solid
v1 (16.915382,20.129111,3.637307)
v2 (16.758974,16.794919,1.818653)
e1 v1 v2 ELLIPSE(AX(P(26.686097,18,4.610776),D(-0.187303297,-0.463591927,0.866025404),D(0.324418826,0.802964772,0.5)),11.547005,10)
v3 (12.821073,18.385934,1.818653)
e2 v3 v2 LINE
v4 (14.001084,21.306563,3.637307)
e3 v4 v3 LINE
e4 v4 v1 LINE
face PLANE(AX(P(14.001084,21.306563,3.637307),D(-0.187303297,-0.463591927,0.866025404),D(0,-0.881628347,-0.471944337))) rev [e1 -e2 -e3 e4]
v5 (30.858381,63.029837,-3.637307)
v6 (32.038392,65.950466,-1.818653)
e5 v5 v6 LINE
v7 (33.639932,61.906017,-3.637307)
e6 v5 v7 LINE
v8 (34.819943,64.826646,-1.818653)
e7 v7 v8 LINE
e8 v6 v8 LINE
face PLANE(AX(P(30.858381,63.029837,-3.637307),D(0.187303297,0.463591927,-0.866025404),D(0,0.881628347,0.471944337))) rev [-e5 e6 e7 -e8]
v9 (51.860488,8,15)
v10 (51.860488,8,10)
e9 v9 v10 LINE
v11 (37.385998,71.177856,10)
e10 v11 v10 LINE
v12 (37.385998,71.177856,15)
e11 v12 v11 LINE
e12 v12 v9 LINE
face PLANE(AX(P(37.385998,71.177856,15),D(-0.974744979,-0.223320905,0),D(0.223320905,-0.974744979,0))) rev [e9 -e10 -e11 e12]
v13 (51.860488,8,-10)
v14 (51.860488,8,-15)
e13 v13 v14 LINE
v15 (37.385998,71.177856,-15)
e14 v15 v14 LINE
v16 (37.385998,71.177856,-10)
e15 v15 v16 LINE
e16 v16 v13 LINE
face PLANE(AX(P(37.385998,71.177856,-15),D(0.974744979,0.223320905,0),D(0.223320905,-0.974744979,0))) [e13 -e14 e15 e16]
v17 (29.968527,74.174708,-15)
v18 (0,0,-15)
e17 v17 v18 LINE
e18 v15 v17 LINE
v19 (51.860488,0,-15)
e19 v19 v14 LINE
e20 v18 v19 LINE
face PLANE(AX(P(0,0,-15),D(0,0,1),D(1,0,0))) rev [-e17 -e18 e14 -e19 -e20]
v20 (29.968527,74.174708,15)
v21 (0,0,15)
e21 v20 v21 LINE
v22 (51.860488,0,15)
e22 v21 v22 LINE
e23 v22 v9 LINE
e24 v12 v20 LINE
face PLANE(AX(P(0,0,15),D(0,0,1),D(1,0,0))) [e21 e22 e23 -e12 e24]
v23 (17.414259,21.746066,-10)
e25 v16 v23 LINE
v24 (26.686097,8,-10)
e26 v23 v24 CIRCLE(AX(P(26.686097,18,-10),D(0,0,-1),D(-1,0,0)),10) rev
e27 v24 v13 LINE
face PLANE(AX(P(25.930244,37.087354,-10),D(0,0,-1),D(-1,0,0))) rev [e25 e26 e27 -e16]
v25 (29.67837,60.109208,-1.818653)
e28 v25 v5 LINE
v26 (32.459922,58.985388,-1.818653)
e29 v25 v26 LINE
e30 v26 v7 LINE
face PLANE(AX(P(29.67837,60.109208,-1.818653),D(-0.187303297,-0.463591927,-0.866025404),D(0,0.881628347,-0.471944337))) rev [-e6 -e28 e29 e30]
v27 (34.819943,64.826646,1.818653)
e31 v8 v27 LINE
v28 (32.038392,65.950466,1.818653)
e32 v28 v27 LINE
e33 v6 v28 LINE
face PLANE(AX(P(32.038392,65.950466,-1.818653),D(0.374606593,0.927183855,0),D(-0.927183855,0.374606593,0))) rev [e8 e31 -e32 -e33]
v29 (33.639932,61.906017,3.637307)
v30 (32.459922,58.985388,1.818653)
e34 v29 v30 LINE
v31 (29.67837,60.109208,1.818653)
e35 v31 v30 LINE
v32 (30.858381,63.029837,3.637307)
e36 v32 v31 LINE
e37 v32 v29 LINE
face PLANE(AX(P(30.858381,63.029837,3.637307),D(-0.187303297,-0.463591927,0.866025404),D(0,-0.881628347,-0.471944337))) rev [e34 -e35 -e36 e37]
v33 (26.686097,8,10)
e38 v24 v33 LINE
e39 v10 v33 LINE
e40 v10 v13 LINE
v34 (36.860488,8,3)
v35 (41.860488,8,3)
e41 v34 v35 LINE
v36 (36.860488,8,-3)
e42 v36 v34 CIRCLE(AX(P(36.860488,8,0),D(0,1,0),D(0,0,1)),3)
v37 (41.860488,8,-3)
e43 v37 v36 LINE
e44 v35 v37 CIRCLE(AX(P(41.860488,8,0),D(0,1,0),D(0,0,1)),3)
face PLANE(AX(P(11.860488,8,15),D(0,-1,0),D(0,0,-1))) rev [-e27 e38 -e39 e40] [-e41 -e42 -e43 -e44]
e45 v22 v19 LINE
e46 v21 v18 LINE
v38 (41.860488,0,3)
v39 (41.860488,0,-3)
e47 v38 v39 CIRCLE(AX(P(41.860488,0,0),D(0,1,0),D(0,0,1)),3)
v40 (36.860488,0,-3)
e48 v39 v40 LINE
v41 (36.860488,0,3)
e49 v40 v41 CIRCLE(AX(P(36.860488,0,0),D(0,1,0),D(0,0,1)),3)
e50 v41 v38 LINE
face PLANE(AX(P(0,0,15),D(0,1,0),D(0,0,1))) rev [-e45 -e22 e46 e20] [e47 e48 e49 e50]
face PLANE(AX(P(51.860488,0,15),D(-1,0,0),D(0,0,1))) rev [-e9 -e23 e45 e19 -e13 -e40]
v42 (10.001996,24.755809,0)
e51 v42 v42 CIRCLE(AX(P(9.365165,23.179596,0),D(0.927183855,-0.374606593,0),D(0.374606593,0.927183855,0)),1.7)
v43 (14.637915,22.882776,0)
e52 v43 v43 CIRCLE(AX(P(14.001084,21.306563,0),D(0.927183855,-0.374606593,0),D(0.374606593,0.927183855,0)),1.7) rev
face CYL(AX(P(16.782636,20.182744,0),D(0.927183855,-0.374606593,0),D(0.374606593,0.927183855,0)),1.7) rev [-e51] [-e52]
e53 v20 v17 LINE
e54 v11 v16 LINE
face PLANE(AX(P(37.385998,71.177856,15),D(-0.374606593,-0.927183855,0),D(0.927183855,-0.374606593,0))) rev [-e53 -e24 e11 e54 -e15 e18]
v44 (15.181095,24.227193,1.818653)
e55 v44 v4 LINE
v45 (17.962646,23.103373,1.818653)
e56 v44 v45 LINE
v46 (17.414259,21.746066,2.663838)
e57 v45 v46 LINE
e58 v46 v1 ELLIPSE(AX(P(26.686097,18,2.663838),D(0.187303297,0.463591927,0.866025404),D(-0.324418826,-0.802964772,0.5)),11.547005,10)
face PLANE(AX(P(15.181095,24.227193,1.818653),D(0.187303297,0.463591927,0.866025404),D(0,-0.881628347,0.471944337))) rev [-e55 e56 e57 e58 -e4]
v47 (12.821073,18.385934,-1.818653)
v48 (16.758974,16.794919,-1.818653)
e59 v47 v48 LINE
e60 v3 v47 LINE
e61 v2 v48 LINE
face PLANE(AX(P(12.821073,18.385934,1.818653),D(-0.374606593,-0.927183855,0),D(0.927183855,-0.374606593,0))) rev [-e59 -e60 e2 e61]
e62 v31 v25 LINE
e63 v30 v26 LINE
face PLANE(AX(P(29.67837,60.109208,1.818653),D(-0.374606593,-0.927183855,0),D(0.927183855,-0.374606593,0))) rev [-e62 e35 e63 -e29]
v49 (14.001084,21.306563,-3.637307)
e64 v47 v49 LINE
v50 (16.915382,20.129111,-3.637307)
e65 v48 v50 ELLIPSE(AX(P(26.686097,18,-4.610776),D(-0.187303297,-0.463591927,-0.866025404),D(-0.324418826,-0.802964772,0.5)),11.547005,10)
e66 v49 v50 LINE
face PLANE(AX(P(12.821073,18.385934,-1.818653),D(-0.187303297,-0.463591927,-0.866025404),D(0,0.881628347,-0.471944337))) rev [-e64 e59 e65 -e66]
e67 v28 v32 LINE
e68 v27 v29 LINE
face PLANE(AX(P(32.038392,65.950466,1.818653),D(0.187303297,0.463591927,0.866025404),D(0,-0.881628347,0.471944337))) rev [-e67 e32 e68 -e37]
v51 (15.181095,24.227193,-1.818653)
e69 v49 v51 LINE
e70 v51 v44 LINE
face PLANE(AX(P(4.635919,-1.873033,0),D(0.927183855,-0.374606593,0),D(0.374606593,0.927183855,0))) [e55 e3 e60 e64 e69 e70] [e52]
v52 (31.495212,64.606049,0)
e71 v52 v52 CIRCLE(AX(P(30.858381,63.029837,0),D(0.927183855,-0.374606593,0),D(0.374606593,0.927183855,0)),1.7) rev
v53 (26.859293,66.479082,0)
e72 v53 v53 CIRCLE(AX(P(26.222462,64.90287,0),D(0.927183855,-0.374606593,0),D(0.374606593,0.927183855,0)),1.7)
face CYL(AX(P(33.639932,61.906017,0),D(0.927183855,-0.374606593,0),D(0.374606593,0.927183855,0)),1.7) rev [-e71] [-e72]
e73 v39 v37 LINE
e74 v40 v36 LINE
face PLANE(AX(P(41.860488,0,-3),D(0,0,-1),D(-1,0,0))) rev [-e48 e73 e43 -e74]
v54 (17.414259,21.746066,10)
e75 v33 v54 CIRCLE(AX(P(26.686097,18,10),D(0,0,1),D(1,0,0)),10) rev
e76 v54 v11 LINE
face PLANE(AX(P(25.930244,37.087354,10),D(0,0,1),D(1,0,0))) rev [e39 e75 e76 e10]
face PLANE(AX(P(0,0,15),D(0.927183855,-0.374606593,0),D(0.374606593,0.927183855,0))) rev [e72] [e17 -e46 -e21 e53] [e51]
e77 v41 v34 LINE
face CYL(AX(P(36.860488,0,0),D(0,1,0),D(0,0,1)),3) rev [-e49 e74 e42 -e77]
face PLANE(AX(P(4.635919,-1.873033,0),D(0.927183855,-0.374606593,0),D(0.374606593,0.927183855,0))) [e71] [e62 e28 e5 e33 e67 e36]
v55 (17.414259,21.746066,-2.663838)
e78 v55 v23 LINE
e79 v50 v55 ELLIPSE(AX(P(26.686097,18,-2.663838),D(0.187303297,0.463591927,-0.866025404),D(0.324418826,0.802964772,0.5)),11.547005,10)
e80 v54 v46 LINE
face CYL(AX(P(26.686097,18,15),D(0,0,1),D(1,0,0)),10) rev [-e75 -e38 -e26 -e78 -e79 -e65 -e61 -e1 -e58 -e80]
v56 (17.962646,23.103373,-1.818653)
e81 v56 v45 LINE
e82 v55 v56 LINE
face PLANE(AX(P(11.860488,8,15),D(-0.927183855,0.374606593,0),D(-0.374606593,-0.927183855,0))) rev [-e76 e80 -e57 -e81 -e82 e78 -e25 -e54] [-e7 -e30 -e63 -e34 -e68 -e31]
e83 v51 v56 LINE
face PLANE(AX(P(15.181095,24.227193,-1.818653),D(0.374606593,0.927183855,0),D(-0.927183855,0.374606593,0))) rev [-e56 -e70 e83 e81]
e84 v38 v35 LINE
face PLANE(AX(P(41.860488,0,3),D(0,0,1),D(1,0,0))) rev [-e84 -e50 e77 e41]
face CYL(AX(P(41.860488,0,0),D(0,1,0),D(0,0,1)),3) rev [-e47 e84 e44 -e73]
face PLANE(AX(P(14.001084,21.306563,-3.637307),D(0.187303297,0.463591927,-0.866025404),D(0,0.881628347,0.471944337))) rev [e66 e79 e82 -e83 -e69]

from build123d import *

# Parameters (mm, degrees)
BOSS_EXTRUDE1_DEPTH           = 15
CUT_EXTRUDE1_DEPTH            = 86.172406393
RIB1_REACH                    = 97.349
SKETCH4_WALL_W                = 257.512394394
SKETCH4_WALL_H                = 5
M3_CLEARANCE_HOLE1_AT_2_COUNT = 2
M3_CLEARANCE_HOLE1_AT_2_PITCH = 45
CUT_EXTRUDE2_DEPTH            = 3
FILLET1_R                     = 10


with BuildPart() as part:
    # Sketch1 → Boss-Extrude1 (new, symmetric)
    with BuildSketch(Plane.XY):
        Polygon((0, 0), (29.968527473, 74.174708365), (37.38599831, 71.177855618), (11.860487748, 8), (51.860487748, 8), (51.860487748, 0), align=None)
    extrude(amount=BOSS_EXTRUDE1_DEPTH, both=True)

    # Sketch2 → Cut-Extrude1 (cut, through all)
    with BuildSketch(Plane(origin=(0.379940125, 8, 0), x_dir=(1, 0, 0), z_dir=(0, 1, 0))):
        with BuildLine():
            Line((41.480547623, -3), (36.480547623, -3))
            ThreePointArc((36.480547623, -3), (33.480547623, 0), (36.480547623, 3))
            Line((36.480547623, 3), (41.480547623, 3))
            ThreePointArc((41.480547623, 3), (44.480547623, 0), (41.480547623, -3))
        make_face()
    extrude(amount=-CUT_EXTRUDE1_DEPTH, mode=Mode.SUBTRACT)

    # Sketch4 wall → Rib1 (add, up to next)
    with BuildSketch(Plane(origin=(44.623243029, 39.588927809, 15), x_dir=(0.223320905083, -0.974744978624, 0), z_dir=(0.974744978624, 0.223320905083, 0)), mode=Mode.PRIVATE) as rib1_sk1:
        with Locations((0, 2.5)):
            Rectangle(SKETCH4_WALL_W, SKETCH4_WALL_H)
    rib1_tool1 = extrude(rib1_sk1.sketch, amount=-RIB1_REACH, mode=Mode.PRIVATE) - part.part
    rib1 = rib1_tool1.solids().sort_by_distance((44.623243029, 39.588927809, 15))[0]
    add(rib1)

    # Mirror1: Rib1 across plane
    add(rib1.mirror(Plane.XY))

    # Sketch7 → M3 Clearance Hole1 (revolve, cut)
    with BuildSketch(Plane(origin=(33.639932376, 61.906017072, 0), x_dir=(0.37460659341591607, 0.9271838545667858, 0), z_dir=(0, 0, 1))):
        Polygon((0, 0), (0, 35.786334818), (1.7, 35.786334818), (1.7, 0.025), (1.725, 0), align=None)
    m3_clearance_hole1 = revolve(axis=Axis((39.527549852, 59.527265204, 0), (-0.9271838545667858, 0.37460659341591607, 0)), mode=Mode.SUBTRACT)

    # M3 Clearance Hole1 at 2: M3 Clearance Hole1 ×2
    with Locations(*[Vector(-0.37460659341591607, -0.9271838545667858, 0) * (i * M3_CLEARANCE_HOLE1_AT_2_PITCH) for i in range(1, M3_CLEARANCE_HOLE1_AT_2_COUNT)]):
        add(m3_clearance_hole1, mode=Mode.SUBTRACT)

    # Sketch8 → Cut-Extrude2 (cut)
    with BuildSketch(Plane(origin=(7.417470837, -2.996852747, 0), x_dir=(0, 0, -1), z_dir=(0.9271838545667858, -0.37460659341591607, 0))):
        Polygon((3.637306696, 70), (1.818653348, 73.15), (-1.818653348, 73.15), (-3.637306696, 70), (-1.818653348, 66.85), (1.818653348, 66.85), align=None)
        Polygon((3.637306696, 25), (1.818653348, 28.15), (-1.818653348, 28.15), (-3.637306696, 25), (-1.818653348, 21.85), (1.818653348, 21.85), align=None)
    extrude(amount=-CUT_EXTRUDE2_DEPTH, mode=Mode.SUBTRACT)

    # Fillet1
    # the kernel refuses this fillet: 10 mm, written as the material it adds along each edge
    with BuildSketch(Plane(origin=(11.860487748, 8, 47.064024213), x_dir=(0.3746065934159096, 0.9271838545667884, 0), z_dir=(0, 0, -1))) as fillet1_piece_1_section:
        with BuildLine():
            CenterArc((FILLET1_R * 1.48256096851, FILLET1_R), FILLET1_R, 158, 112)
            Line((FILLET1_R * 0.555377113946, FILLET1_R * 1.37460659342), (0, 0))
            Line((0, 0), (FILLET1_R * 1.48256096851, 0))
        make_face()
    fillet1_piece_1 = extrude(amount=94.128048426, mode=Mode.PRIVATE)
    fillet1_piece_1 = split(fillet1_piece_1, bisect_by=Plane(origin=(16.410561538, 18.315636212, 15), z_dir=(0, 0, -1)), keep=Keep.TOP, mode=Mode.PRIVATE)
    fillet1_piece_1 = split(fillet1_piece_1, bisect_by=Plane(origin=(17.191225171, 20.247846508, 3.760526332), z_dir=(-0.18730329670795798, -0.46359192728339266, 0.866025403784439)), keep=Keep.TOP, mode=Mode.PRIVATE)
    add(fillet1_piece_1)
    with BuildSketch(Plane(origin=(11.860487748, 8, 47.064024213), x_dir=(0.3746065934159096, 0.9271838545667884, 0), z_dir=(0, 0, -1))) as fillet1_piece_2_section:
        with BuildLine():
            CenterArc((FILLET1_R * 1.48256096851, FILLET1_R), FILLET1_R, 158, 112)
            Line((FILLET1_R * 0.555377113946, FILLET1_R * 1.37460659342), (0, 0))
            Line((0, 0), (FILLET1_R * 1.48256096851, 0))
        make_face()
    fillet1_piece_2 = extrude(amount=94.128048426, mode=Mode.PRIVATE)
    fillet1_piece_2 = split(fillet1_piece_2, bisect_by=Plane(origin=(16.998453552, 20.640654754, 3.929107959), z_dir=(0.18730329670795798, 0.46359192728339266, -0.866025403784439)), keep=Keep.TOP, mode=Mode.PRIVATE)
    fillet1_piece_2 = split(fillet1_piece_2, bisect_by=Plane(origin=(16.998453552, 20.640654754, 3.345505432), z_dir=(0.18730329670795837, 0.4635919272833937, 0.8660254037844384)), keep=Keep.TOP, mode=Mode.PRIVATE)
    add(fillet1_piece_2)
    with BuildSketch(Plane(origin=(11.860487748, 8, 47.064024213), x_dir=(0.3746065934159096, 0.9271838545667884, 0), z_dir=(0, 0, -1))) as fillet1_piece_3_section:
        with BuildLine():
            CenterArc((FILLET1_R * 1.48256096851, FILLET1_R), FILLET1_R, 158, 112)
            Line((FILLET1_R * 0.555377113946, FILLET1_R * 1.37460659342), (0, 0))
            Line((0, 0), (FILLET1_R * 1.48256096851, 0))
        make_face()
    fillet1_piece_3 = extrude(amount=57.064024213, mode=Mode.PRIVATE)
    fillet1_piece_3 = split(fillet1_piece_3, bisect_by=Plane(origin=(16.596548346, 16.860543337, 0), z_dir=(-0.3746065934159161, -0.9271838545667858, 0)), keep=Keep.TOP, mode=Mode.PRIVATE)
    fillet1_piece_3 = split(fillet1_piece_3, bisect_by=Plane(origin=(17.125135573, 18.168842634, 4.641292114), z_dir=(-0.18730329670795837, -0.4635919272833937, -0.8660254037844384)), keep=Keep.TOP, mode=Mode.PRIVATE)
    add(fillet1_piece_3)
    with BuildSketch(Plane(origin=(11.860487748, 8, 47.064024213), x_dir=(0.3746065934159096, 0.9271838545667884, 0), z_dir=(0, 0, -1))) as fillet1_piece_4_section:
        with BuildLine():
            CenterArc((FILLET1_R * 1.48256096851, FILLET1_R), FILLET1_R, 158, 112)
            Line((FILLET1_R * 0.555377113946, FILLET1_R * 1.37460659342), (0, 0))
            Line((0, 0), (FILLET1_R * 1.48256096851, 0))
        make_face()
    fillet1_piece_4 = extrude(amount=57.064024213, mode=Mode.PRIVATE)
    fillet1_piece_4 = split(fillet1_piece_4, bisect_by=Plane(origin=(16.526523366, 18.36657569, -2.60970235), z_dir=(-0.18730329670795812, -0.463591927283393, -0.8660254037844388)), keep=Keep.TOP, mode=Mode.PRIVATE)
    add(fillet1_piece_4)
    with BuildSketch(Plane(origin=(11.860487748, 8, 47.064024213), x_dir=(0.3746065934159096, 0.9271838545667884, 0), z_dir=(0, 0, -1))) as fillet1_piece_5_section:
        with BuildLine():
            CenterArc((FILLET1_R * 1.48256096851, FILLET1_R), FILLET1_R, 158, 112)
            Line((FILLET1_R * 0.555377113946, FILLET1_R * 1.37460659342), (0, 0))
            Line((0, 0), (FILLET1_R * 1.48256096851, 0))
        make_face()
    fillet1_piece_5 = extrude(amount=94.128048426, mode=Mode.PRIVATE)
    fillet1_piece_5 = split(fillet1_piece_5, bisect_by=Plane(origin=(16.998453552, 20.640654754, -3.929107959), z_dir=(0.18730329670795812, 0.463591927283393, 0.8660254037844388)), keep=Keep.TOP, mode=Mode.PRIVATE)
    fillet1_piece_5 = split(fillet1_piece_5, bisect_by=Plane(origin=(16.998453552, 20.640654754, -3.345505432), z_dir=(0.18730329670795812, 0.4635919272833931, -0.8660254037844387)), keep=Keep.TOP, mode=Mode.PRIVATE)
    add(fillet1_piece_5)


solid = part.part
